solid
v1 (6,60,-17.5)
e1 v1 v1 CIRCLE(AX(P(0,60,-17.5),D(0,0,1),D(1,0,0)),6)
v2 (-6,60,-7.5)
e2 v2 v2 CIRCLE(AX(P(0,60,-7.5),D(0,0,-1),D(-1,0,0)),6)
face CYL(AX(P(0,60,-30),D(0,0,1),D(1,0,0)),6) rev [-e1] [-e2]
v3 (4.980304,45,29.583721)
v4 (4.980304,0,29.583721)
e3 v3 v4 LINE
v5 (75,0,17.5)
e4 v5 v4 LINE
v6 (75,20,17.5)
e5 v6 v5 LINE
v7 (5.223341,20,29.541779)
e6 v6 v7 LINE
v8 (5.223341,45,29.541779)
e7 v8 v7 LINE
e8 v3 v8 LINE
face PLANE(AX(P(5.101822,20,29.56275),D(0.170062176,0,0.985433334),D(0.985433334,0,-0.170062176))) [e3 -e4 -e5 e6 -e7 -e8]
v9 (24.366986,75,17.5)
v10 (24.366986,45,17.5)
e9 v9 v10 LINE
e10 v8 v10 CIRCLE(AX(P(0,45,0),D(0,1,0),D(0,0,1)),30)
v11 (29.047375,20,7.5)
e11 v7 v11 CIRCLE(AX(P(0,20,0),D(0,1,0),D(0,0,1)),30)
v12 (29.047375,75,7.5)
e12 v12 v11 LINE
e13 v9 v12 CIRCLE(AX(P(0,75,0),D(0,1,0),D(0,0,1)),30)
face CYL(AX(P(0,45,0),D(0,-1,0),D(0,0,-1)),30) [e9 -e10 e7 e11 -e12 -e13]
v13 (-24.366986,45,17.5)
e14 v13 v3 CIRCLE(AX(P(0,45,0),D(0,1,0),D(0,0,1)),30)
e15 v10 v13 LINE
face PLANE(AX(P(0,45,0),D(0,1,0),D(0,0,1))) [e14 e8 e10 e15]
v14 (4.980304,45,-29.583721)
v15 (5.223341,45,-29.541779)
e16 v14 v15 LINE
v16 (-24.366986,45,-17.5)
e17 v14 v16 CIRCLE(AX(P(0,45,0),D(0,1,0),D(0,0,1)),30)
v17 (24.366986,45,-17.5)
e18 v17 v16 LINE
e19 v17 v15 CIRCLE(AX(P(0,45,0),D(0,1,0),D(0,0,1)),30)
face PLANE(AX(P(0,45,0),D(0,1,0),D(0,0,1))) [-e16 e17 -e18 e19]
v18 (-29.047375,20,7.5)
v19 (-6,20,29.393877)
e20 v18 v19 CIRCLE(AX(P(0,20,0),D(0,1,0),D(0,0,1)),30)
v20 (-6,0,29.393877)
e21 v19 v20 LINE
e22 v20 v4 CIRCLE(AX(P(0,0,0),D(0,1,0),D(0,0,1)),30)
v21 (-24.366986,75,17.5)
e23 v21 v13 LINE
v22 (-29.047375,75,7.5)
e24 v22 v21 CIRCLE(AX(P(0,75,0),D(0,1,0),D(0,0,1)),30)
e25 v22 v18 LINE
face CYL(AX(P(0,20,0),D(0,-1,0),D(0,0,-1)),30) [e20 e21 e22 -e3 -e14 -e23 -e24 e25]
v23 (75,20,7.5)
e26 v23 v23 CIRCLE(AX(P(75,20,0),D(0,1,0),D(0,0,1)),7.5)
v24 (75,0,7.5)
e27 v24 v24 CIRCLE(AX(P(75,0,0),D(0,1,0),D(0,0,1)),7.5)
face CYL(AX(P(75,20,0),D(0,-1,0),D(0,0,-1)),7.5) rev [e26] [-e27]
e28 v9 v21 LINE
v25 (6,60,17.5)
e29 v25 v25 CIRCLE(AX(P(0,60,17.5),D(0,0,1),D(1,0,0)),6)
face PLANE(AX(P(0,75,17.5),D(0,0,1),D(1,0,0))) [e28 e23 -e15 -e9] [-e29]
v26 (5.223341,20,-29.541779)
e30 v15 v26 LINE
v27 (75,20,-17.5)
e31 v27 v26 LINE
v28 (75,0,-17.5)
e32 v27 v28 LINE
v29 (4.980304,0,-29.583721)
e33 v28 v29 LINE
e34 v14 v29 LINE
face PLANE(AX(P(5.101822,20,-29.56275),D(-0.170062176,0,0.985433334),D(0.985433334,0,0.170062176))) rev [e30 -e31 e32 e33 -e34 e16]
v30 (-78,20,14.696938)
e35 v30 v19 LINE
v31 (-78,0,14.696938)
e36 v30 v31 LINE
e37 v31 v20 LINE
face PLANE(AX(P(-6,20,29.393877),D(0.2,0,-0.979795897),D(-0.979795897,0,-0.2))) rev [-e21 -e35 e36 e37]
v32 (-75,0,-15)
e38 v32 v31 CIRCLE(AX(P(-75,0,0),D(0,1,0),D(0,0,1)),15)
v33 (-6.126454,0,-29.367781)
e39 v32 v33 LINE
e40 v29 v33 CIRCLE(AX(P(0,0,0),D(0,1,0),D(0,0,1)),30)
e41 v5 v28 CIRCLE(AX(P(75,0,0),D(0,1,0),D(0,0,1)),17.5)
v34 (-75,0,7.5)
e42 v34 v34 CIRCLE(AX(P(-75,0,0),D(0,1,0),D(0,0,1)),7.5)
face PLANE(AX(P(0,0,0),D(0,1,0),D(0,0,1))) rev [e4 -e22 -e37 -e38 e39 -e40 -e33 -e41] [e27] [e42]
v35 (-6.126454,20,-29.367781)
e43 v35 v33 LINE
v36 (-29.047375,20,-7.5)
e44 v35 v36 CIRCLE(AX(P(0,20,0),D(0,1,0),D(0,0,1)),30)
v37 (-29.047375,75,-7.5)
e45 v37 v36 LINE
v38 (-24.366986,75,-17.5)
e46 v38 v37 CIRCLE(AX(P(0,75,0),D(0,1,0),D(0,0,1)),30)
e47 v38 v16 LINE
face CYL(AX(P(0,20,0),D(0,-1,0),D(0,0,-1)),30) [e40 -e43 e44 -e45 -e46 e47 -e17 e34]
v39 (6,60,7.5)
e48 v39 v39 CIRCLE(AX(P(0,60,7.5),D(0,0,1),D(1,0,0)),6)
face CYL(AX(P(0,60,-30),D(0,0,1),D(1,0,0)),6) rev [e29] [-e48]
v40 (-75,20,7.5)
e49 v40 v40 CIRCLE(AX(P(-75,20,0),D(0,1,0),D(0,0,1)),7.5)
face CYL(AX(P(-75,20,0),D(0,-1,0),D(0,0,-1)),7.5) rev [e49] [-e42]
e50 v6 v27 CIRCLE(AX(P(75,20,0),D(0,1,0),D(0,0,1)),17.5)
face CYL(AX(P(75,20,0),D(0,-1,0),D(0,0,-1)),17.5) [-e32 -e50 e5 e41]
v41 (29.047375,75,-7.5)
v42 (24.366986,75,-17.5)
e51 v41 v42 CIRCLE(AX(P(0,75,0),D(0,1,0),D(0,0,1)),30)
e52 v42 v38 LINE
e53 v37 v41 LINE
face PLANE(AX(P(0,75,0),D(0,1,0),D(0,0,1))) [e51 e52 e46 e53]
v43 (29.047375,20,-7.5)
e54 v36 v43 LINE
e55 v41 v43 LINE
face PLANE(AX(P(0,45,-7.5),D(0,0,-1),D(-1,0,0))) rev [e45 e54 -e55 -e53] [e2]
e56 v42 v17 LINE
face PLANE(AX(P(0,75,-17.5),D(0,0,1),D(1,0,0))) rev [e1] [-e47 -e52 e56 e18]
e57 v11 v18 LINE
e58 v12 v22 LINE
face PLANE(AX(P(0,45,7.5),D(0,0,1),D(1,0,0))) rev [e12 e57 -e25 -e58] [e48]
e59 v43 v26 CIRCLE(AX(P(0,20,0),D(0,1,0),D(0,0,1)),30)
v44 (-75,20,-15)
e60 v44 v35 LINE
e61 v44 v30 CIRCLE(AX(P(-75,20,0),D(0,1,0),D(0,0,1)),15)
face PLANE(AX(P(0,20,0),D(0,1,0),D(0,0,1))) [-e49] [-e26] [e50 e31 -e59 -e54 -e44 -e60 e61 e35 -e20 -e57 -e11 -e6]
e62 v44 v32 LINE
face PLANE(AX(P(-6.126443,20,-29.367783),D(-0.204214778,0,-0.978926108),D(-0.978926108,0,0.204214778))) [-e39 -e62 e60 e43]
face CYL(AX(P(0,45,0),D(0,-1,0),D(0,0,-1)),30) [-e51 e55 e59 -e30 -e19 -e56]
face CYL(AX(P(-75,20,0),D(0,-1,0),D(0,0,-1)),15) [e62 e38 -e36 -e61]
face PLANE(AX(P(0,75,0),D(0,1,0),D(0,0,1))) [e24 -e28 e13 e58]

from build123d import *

# Parameters (mm, degrees)
SALIENTE_EXTRUIR1_OUTLINE_R = 7.5
SALIENTE_EXTRUIR1_DEPTH     = 20
SALIENTE_EXTRUIR2_START     = 20
CROQUIS2_4_R                = 7.5
SALIENTE_EXTRUIR2_DEPTH     = 25
SALIENTE_EXTRUIR3_START     = 45
SALIENTE_EXTRUIR3_DEPTH     = 30
CORTAR_EXTRUIR1_DEPTH       = 123.805740908
CORTAR_EXTRUIR1_DEPTH_BACK  = 123.805740908
CROQUIS3_R                  = 6


# Read off the part's stored shape, not the designer's step: Saliente-Extruir1
with BuildPart() as part:
    # Saliente-Extruir1 outline → Saliente-Extruir1 (new body)
    with BuildSketch(Plane(origin=(0, 0, 0), x_dir=(1, 0, 0), z_dir=(0, 1, 0))):
        with BuildLine():
            Line((75, 17.5), (4.980303505, 29.583721487))
            ThreePointArc((4.980303505, 29.583721487), (-0.583157592, 29.994331585), (-6.126453941, 29.367781021))
            Line((-6.126453941, 29.367781021), (-75, 15))
            ThreePointArc((-75, 15), (-89.924042295, 1.50763443), (-78, -14.696938457))
            Line((-78, -14.696938457), (-6, -29.393876913))
            ThreePointArc((-6, -29.393876913), (-0.518609175, -29.995517074), (4.980303505, -29.583721487))
            Line((4.980303505, -29.583721487), (75, -17.5))
            ThreePointArc((75, -17.5), (92.5, 0), (75, 17.5))
        make_face()
        with Locations((-75, 0)):
            Circle(SALIENTE_EXTRUIR1_OUTLINE_R, mode=Mode.SUBTRACT)
        with Locations((75, 0)):
            Circle(SALIENTE_EXTRUIR1_OUTLINE_R, mode=Mode.SUBTRACT)
    extrude(amount=SALIENTE_EXTRUIR1_DEPTH)

    # Croquis2<4> → Saliente-Extruir2 (add)
    with BuildSketch(Plane(origin=(0, 0, 0), x_dir=(1, 0, 0), z_dir=(0, 1, 0)).offset(SALIENTE_EXTRUIR2_START)):
        with Locations(Location((-75, 0, 0), (0, 0, 270))):
            Circle(CROQUIS2_4_R)
        with Locations(Location((75, 0, 0), (0, 0, 270))):
            Circle(CROQUIS2_4_R)
        with BuildLine():
            Line((29.047375097, 7.5), (-29.047375097, 7.5))
            ThreePointArc((-29.047375097, 7.5), (0, 30), (29.047375097, 7.5))
        make_face()
        with BuildLine():
            Line((-29.047375097, -7.5), (29.047375097, -7.5))
            ThreePointArc((29.047375097, -7.5), (0, -30), (-29.047375097, -7.5))
        make_face()
    extrude(amount=SALIENTE_EXTRUIR2_DEPTH)


with BuildPart() as saliente_extruir2_kept_piece:
    # of the separate pieces the step leaves, the one the design keeps (saliente_extruir2_pieces_kept)
    add(part.part.solids().sort_by_distance((4.980303505, 0, 29.583721487))[0])

    # Croquis2<5> → Saliente-Extruir3 (add)
    with BuildSketch(Plane(origin=(0, 0, 0), x_dir=(1, 0, 0), z_dir=(0, 1, 0)).offset(SALIENTE_EXTRUIR3_START)):
        with BuildLine():
            Line((24.366985862, 17.5), (-24.366985862, 17.5))
            ThreePointArc((-24.366985862, 17.5), (-27.171188586, 12.717173855), (-29.047375097, 7.5))
            Line((-29.047375097, 7.5), (29.047375097, 7.5))
            ThreePointArc((29.047375097, 7.5), (27.171188586, 12.717173855), (24.366985862, 17.5))
        make_face()
        with BuildLine():
            ThreePointArc((-29.047375097, -7.5), (-27.171188586, -12.717173855), (-24.366985862, -17.5))
            Line((-24.366985862, -17.5), (24.366985862, -17.5))
            ThreePointArc((24.366985862, -17.5), (27.171188586, -12.717173855), (29.047375097, -7.5))
            Line((29.047375097, -7.5), (-29.047375097, -7.5))
        make_face()
    extrude(amount=SALIENTE_EXTRUIR3_DEPTH)

    # Croquis3 → Cortar-Extruir1 (cut, two sides: drawn at the far end of the back side and taken through both)
    with BuildSketch(Plane.XY.offset(-CORTAR_EXTRUIR1_DEPTH_BACK)):
        with Locations((0, 60)):
            Circle(CROQUIS3_R)
    extrude(amount=CORTAR_EXTRUIR1_DEPTH + CORTAR_EXTRUIR1_DEPTH_BACK, mode=Mode.SUBTRACT)


solid = saliente_extruir2_kept_piece.part
